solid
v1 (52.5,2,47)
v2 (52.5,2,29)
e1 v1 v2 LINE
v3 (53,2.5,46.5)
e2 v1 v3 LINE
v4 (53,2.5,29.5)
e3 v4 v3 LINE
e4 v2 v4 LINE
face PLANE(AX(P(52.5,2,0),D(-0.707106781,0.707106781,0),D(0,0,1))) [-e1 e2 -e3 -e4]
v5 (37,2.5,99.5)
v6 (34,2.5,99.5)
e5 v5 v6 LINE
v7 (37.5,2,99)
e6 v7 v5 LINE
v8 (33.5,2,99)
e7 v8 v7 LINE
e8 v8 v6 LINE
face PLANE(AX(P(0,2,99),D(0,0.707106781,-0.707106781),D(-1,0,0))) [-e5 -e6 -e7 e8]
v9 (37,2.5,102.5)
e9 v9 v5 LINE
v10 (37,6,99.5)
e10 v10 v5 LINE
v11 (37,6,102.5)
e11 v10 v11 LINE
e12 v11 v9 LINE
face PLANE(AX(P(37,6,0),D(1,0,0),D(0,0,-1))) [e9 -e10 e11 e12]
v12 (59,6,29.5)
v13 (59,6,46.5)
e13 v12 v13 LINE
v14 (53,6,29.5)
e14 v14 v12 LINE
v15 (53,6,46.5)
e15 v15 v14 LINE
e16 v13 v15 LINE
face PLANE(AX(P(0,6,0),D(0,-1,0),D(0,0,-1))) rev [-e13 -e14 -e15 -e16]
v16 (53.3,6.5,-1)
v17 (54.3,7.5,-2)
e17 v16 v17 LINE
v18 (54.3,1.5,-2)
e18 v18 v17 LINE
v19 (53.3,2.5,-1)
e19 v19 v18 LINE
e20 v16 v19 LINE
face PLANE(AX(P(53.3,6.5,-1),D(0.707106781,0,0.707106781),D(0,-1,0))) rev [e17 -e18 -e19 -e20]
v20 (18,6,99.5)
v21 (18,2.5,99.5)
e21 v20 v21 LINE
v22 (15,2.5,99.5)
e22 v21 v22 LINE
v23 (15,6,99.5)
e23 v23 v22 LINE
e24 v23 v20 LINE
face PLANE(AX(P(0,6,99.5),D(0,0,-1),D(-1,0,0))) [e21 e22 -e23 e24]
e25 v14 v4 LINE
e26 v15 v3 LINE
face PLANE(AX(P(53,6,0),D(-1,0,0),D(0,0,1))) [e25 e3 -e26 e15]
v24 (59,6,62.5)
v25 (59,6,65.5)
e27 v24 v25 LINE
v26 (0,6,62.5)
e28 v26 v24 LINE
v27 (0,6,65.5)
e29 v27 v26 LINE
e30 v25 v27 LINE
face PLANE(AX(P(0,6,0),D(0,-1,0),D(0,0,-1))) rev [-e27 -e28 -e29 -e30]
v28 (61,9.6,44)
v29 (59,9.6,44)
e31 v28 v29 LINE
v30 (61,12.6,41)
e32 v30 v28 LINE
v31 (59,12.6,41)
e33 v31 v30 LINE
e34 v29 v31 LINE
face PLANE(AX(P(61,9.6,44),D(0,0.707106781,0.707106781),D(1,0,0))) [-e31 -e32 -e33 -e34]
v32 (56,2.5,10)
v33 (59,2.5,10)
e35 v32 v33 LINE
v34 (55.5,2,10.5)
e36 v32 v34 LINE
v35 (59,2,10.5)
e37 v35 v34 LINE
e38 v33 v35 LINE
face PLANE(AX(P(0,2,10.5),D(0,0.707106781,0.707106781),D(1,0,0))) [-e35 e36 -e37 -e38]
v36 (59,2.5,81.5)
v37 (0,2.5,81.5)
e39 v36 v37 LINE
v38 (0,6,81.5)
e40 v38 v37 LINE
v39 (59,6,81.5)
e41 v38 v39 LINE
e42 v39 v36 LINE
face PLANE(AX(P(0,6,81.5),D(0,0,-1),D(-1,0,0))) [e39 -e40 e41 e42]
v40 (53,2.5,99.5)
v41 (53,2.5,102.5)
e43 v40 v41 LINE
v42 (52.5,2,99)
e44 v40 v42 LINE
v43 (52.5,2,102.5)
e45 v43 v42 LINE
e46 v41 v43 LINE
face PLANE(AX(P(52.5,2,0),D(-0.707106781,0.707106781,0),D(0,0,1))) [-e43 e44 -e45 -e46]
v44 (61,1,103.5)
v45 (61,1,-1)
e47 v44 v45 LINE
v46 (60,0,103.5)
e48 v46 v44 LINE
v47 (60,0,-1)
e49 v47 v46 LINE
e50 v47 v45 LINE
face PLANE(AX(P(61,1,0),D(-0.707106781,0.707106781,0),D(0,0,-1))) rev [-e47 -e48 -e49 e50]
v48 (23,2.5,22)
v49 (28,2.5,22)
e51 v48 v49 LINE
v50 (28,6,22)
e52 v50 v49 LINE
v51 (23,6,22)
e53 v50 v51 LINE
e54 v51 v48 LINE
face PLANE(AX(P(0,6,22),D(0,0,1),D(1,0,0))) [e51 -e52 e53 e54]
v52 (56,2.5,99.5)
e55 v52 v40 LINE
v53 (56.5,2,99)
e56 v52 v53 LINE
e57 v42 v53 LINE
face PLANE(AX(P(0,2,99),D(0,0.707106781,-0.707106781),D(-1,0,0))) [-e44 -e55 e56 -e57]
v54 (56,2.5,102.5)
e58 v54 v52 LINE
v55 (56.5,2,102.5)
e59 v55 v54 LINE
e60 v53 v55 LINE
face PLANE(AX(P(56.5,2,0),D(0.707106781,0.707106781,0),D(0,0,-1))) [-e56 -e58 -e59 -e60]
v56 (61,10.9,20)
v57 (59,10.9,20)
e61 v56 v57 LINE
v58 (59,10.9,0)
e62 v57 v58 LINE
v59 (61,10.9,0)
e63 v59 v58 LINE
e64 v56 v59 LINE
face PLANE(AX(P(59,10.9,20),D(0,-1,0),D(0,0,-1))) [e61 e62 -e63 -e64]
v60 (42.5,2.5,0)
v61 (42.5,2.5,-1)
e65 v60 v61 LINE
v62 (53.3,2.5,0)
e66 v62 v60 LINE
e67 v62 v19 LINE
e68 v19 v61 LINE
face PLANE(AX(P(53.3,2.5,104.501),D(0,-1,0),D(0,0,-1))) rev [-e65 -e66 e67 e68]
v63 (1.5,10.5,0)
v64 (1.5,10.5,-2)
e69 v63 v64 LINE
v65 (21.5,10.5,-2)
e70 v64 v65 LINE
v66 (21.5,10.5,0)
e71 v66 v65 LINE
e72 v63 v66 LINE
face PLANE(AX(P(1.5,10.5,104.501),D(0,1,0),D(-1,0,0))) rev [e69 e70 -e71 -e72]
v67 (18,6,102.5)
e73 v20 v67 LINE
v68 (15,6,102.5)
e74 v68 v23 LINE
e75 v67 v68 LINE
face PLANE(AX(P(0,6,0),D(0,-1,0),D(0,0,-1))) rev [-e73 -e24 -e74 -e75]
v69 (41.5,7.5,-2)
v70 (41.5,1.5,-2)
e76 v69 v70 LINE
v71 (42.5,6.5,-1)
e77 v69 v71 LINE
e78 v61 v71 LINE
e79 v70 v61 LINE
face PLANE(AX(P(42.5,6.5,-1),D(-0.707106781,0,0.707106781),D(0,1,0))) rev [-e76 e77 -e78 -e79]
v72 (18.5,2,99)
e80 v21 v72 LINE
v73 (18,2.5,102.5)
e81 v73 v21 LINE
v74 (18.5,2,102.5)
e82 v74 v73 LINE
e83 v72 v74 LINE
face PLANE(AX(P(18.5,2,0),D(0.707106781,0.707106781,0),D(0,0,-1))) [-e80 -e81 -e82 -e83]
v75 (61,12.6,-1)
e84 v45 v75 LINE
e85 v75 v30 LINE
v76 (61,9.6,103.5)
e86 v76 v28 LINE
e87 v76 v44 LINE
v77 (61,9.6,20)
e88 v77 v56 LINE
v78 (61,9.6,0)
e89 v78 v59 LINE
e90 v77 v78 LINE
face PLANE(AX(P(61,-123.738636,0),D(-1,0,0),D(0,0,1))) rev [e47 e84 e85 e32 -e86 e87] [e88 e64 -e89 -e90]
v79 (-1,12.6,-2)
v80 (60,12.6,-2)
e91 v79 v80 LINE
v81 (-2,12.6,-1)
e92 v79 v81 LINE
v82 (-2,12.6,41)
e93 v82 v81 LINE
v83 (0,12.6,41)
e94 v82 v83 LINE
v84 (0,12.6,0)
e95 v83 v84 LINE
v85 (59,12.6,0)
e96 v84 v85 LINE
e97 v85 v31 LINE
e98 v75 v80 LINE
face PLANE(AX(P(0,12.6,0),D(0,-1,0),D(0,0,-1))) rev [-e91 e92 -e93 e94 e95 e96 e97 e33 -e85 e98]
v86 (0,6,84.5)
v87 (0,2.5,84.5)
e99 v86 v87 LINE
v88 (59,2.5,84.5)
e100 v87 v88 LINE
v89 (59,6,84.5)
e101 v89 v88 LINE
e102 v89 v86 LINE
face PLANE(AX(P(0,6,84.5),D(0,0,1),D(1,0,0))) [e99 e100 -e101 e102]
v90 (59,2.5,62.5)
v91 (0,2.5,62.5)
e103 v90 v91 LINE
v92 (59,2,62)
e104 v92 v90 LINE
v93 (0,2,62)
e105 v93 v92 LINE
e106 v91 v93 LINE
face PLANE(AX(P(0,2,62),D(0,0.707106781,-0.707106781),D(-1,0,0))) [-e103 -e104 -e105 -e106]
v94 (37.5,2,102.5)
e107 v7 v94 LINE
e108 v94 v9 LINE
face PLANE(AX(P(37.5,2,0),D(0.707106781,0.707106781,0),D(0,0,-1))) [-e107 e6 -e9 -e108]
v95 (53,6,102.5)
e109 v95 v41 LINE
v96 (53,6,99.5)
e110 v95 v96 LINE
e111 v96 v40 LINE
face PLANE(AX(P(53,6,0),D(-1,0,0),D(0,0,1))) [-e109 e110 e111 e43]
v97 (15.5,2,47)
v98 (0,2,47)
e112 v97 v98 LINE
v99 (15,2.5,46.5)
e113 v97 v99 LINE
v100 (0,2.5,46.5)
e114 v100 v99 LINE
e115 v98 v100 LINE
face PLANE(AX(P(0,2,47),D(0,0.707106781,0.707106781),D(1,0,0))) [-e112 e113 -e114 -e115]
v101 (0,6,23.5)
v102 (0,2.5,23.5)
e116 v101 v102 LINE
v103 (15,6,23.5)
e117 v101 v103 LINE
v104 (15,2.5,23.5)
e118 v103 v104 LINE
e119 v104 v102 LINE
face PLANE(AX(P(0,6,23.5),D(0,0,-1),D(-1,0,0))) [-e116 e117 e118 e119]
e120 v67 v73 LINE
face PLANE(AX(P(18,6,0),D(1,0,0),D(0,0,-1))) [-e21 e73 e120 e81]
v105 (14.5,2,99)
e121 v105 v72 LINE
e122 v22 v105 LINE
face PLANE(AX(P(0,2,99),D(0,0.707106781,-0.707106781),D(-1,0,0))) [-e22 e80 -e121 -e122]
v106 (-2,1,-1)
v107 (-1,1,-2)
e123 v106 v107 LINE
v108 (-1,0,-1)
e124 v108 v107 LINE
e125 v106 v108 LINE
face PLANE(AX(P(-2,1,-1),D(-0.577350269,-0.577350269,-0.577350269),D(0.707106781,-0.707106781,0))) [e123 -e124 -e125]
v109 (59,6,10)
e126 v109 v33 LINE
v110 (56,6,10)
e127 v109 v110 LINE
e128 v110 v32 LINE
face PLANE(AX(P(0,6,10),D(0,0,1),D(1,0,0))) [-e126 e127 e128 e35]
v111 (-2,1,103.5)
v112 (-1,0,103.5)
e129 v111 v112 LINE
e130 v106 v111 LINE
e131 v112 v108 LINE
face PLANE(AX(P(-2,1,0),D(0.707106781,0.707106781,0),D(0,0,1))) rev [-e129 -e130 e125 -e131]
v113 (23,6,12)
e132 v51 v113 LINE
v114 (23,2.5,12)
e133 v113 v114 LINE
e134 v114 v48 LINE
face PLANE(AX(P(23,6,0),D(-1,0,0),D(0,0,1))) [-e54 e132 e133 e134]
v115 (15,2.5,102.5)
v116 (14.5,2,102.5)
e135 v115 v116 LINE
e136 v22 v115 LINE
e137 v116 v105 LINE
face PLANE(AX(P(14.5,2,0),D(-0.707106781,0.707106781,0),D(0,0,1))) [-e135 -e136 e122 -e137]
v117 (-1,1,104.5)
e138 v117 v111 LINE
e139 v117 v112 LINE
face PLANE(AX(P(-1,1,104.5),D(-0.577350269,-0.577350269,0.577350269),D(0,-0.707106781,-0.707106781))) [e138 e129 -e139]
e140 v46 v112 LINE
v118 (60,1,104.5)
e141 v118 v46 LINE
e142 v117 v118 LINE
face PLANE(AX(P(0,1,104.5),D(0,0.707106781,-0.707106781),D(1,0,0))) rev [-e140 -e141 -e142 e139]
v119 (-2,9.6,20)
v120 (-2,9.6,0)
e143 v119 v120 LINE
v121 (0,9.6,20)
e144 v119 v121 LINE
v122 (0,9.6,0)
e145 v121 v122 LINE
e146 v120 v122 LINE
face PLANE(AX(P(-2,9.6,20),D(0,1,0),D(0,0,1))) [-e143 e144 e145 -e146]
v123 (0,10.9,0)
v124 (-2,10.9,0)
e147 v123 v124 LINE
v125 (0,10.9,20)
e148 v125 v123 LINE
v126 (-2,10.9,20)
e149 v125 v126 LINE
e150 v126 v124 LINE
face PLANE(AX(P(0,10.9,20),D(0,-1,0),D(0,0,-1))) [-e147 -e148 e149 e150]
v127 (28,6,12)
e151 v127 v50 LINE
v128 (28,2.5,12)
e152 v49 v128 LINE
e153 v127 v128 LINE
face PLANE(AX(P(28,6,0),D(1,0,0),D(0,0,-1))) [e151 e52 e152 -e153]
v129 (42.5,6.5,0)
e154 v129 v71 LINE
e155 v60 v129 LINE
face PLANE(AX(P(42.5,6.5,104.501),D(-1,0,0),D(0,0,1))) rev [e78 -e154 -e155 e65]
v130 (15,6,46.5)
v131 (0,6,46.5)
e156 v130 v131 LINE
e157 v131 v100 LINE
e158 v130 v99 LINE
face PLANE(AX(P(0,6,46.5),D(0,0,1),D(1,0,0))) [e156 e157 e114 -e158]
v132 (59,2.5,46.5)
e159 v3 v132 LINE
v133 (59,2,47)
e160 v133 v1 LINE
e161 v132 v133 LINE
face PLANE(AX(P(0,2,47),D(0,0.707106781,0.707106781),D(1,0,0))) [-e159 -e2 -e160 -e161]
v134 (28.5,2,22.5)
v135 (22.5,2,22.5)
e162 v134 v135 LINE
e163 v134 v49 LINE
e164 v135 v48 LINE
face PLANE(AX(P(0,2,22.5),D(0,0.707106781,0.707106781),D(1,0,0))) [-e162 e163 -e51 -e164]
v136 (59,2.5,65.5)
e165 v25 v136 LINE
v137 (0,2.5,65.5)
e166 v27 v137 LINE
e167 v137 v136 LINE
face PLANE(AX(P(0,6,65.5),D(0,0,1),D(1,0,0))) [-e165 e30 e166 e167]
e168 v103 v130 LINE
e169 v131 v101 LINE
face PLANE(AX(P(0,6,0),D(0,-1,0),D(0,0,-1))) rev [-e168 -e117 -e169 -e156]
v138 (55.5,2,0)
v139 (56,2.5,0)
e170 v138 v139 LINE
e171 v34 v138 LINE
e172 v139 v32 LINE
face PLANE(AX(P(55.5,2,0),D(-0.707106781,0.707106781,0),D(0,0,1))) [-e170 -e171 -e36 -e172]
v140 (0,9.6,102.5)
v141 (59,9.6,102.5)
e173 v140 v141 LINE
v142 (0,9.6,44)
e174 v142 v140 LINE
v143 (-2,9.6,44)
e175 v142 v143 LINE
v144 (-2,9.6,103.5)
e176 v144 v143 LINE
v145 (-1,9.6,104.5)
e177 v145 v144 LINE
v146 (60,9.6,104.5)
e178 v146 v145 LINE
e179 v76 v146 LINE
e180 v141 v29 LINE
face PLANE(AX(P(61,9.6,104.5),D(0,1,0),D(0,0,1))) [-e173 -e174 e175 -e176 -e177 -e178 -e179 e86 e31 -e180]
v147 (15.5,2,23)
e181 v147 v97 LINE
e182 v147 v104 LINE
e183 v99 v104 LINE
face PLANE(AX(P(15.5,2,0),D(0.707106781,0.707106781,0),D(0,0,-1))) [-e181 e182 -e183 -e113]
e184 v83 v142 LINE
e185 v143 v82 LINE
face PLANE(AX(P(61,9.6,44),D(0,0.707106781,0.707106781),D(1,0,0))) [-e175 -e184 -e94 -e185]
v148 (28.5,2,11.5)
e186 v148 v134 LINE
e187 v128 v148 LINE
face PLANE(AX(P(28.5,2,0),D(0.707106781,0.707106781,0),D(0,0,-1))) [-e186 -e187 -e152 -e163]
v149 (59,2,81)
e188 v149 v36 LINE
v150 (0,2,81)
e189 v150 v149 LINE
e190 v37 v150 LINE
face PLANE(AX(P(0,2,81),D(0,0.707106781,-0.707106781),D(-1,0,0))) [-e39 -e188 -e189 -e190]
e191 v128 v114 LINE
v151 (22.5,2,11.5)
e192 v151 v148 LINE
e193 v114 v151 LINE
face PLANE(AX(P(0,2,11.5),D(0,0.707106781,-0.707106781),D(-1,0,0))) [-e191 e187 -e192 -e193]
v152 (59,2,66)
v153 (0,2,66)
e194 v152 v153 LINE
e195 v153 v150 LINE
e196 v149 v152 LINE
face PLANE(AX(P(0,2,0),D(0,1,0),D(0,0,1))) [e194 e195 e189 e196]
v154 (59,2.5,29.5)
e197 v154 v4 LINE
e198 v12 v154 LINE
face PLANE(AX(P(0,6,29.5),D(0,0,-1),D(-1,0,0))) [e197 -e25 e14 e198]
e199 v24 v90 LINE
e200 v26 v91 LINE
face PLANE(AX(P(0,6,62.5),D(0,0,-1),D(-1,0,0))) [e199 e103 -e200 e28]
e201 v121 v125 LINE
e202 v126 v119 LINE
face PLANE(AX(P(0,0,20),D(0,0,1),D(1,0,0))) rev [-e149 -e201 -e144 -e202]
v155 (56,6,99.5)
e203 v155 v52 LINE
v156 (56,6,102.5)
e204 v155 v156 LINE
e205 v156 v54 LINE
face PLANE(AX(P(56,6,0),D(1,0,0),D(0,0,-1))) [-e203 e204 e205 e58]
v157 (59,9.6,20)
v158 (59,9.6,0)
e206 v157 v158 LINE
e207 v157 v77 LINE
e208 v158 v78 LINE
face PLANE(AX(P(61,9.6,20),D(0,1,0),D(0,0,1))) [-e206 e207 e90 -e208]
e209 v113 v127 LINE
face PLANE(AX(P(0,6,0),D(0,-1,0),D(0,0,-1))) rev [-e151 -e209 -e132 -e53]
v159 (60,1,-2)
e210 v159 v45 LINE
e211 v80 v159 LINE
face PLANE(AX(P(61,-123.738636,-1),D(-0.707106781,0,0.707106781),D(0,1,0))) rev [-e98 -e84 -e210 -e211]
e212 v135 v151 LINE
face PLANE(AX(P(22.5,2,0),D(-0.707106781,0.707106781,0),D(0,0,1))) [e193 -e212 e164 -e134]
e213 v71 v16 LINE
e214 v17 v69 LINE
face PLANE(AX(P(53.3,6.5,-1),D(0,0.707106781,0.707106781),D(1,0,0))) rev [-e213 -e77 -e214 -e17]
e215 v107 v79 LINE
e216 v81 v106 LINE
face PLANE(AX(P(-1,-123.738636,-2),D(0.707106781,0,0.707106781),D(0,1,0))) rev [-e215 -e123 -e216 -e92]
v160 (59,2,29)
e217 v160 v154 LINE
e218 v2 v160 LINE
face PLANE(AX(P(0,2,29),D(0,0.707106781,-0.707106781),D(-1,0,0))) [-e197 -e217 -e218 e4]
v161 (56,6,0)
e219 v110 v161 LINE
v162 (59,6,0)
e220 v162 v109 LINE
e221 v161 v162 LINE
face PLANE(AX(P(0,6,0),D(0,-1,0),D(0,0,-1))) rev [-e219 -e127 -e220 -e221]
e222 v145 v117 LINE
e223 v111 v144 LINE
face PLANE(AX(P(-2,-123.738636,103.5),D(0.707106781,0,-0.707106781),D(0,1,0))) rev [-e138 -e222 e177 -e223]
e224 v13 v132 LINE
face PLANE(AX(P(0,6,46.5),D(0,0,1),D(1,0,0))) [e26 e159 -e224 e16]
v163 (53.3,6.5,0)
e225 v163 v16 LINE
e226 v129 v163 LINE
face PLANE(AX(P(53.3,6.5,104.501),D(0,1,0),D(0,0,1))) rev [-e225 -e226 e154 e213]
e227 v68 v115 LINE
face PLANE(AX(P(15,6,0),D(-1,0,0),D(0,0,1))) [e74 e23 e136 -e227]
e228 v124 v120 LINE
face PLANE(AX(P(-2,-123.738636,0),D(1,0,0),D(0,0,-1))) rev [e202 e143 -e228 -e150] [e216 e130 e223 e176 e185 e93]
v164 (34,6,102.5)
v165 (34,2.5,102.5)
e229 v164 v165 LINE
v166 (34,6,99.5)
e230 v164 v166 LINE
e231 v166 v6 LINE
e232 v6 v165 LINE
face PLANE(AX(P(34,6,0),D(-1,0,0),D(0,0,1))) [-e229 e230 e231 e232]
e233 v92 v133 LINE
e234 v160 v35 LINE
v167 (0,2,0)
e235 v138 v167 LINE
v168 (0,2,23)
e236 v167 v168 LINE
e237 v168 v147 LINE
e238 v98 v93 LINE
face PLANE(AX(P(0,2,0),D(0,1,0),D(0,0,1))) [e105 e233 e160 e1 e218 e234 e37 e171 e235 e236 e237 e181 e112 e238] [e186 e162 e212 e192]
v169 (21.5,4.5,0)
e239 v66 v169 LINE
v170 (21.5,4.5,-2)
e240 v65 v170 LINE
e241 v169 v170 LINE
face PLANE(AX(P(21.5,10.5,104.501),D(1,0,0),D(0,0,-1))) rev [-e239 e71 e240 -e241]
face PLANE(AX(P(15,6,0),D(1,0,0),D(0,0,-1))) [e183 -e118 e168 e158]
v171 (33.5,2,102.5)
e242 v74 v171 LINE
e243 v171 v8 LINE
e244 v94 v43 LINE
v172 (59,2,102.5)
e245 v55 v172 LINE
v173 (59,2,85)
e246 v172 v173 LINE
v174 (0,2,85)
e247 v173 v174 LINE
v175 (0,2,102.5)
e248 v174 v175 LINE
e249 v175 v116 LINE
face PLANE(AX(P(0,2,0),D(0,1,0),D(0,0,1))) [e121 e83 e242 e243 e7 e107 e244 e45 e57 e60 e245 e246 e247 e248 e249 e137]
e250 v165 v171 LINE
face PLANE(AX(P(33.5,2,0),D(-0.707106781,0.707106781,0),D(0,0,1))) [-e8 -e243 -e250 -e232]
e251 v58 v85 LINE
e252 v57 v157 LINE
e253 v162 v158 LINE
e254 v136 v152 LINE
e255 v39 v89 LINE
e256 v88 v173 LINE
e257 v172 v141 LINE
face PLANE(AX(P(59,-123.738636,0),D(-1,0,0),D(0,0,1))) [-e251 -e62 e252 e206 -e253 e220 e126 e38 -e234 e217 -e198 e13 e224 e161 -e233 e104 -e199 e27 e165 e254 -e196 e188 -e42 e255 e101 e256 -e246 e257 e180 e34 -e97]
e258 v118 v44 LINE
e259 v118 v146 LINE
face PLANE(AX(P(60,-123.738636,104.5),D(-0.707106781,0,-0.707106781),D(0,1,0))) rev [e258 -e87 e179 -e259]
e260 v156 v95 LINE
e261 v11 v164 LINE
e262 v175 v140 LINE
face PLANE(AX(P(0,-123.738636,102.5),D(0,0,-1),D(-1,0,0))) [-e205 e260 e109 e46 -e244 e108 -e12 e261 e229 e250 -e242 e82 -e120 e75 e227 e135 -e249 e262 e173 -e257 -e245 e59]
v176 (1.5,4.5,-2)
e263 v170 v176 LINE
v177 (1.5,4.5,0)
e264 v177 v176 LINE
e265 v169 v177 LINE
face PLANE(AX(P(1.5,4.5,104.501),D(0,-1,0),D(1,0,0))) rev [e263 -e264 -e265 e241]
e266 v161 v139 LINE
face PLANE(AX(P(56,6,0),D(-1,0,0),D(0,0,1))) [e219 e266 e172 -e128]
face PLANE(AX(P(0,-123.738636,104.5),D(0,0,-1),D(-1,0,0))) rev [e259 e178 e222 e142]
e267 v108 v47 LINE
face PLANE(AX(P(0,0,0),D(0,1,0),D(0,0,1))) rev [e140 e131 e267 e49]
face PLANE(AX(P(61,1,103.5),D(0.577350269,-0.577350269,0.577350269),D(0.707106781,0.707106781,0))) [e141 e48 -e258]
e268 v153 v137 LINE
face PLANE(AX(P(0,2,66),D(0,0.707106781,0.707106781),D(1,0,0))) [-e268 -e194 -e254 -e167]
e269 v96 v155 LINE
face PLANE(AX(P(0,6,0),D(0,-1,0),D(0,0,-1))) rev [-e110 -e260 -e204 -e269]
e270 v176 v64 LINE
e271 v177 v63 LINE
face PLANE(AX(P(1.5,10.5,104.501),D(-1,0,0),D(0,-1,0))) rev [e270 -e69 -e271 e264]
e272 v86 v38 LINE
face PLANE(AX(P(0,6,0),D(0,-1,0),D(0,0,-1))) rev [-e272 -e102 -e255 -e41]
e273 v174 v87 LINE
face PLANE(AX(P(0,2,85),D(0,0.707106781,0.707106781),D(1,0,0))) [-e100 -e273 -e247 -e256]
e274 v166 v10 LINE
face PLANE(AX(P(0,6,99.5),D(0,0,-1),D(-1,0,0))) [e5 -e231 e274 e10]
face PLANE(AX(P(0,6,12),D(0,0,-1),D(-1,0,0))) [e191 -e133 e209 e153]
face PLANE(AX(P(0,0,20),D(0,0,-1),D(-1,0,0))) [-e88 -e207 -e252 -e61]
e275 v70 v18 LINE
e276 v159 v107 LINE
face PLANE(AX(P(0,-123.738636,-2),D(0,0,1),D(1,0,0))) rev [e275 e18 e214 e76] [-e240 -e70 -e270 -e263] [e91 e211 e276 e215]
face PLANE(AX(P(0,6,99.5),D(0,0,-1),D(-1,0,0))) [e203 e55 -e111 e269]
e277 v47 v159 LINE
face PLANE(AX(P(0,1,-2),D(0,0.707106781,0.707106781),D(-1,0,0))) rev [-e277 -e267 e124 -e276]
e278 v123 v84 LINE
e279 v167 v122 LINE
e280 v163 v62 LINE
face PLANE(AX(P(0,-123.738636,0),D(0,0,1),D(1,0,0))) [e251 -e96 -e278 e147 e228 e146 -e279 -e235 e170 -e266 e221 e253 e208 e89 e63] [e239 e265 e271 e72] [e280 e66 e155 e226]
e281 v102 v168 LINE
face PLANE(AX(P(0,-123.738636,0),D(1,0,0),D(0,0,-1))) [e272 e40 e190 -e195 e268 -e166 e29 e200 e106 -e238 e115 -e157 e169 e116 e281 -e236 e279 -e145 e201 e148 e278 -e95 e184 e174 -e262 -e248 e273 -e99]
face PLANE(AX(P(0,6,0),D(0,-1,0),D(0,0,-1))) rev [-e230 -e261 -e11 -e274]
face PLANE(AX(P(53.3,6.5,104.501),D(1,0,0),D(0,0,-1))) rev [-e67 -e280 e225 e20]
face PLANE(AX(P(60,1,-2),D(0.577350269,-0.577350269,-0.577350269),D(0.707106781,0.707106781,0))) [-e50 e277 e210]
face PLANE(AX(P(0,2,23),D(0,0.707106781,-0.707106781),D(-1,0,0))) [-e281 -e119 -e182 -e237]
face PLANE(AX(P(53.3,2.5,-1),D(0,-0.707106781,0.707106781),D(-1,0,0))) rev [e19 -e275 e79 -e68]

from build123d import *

# Parameters (mm, degrees)
SKETCH1_W               = 59
SKETCH1_H               = 102.5
BOSS_EXTRUDE1_DEPTH     = 2
SKETCH2_W               = 63
SKETCH2_H               = 106.5
SKETCH2_W_2             = 59
SKETCH2_H_2             = 102.5
BOSS_EXTRUDE2_DEPTH     = 12.6
SKETCH4_W               = 59
SKETCH4_H               = 3
SKETCH4_W_2             = 3
SKETCH4_W_3             = 15
SKETCH4_H_2             = 23
SKETCH4_W_4             = 6
SKETCH4_H_3             = 17
SKETCH4_H_4             = 10
SKETCH4_W_5             = 5
BOSS_EXTRUDE3_DEPTH     = 4
CUT_EXTRUDE1_REACH      = 125.378
SKETCH5_W               = 20
SKETCH5_H               = 6
SKETCH5_W_2             = 10.8
SKETCH5_H_2             = 4
CHAMFER1_SIZE           = 0.5
CHAMFER2_SIZE           = 1
SKETCH6_W               = 2
SKETCH6_H               = 1.3
CUT_EXTRUDE2_DEPTH      = 20
CUT_EXTRUDE3_DEPTH      = 122.655291706
CUT_EXTRUDE3_DEPTH_BACK = 122.655291706
SKETCH7_W               = 60.5
SKETCH7_H               = 3
CHAMFER3_SIZE           = 3


with BuildPart() as part:
    # Sketch1 → Boss-Extrude1 (new body)
    with BuildSketch(Plane(origin=(0, 0, 0), x_dir=(1, 0, 0), z_dir=(0, 1, 0))):
        with Locations((29.5, -51.25)):
            Rectangle(SKETCH1_W, SKETCH1_H)
    extrude(amount=BOSS_EXTRUDE1_DEPTH)

    # Sketch2 → Boss-Extrude2 (add)
    with BuildSketch(Plane(origin=(0, 0, 0), x_dir=(1, 0, 0), z_dir=(0, 1, 0))):
        with Locations((29.5, -51.25)):
            Rectangle(SKETCH2_W, SKETCH2_H)
        with Locations((29.5, -51.25)):
            Rectangle(SKETCH2_W_2, SKETCH2_H_2, mode=Mode.SUBTRACT)
    extrude(amount=BOSS_EXTRUDE2_DEPTH)

    # Sketch4 → Boss-Extrude3 (add)
    with BuildSketch(Plane(origin=(0, 2, 0), x_dir=(1, 0, 0), z_dir=(0, 1, 0))):
        with Locations((29.5, -83)):
            Rectangle(SKETCH4_W, SKETCH4_H)
        with Locations((29.5, -64)):
            Rectangle(SKETCH4_W, SKETCH4_H)
        with Locations((16.5, -101)):
            Rectangle(SKETCH4_W_2, SKETCH4_H)
        with Locations((35.5, -101)):
            Rectangle(SKETCH4_W_2, SKETCH4_H)
        with Locations((54.5, -101)):
            Rectangle(SKETCH4_W_2, SKETCH4_H)
        with Locations((7.5, -35)):
            Rectangle(SKETCH4_W_3, SKETCH4_H_2)
        with Locations((56, -38)):
            Rectangle(SKETCH4_W_4, SKETCH4_H_3)
        with Locations((57.5, -5)):
            Rectangle(SKETCH4_W_2, SKETCH4_H_4)
        with Locations((25.5, -17)):
            Rectangle(SKETCH4_W_5, SKETCH4_H_4)
    extrude(amount=BOSS_EXTRUDE3_DEPTH)

    # Sketch5 → Cut-Extrude1 (cut, up to next)
    with BuildSketch(Plane(origin=(0, 0, -2), x_dir=(-1, 0, 0), z_dir=(0, 0, -1)), mode=Mode.PRIVATE) as cut_extrude1_sk1:
        with Locations((-11.5, 7.5)):
            Rectangle(SKETCH5_W, SKETCH5_H)
    cut_extrude1_tool1 = extrude(cut_extrude1_sk1.sketch, amount=-CUT_EXTRUDE1_REACH, mode=Mode.PRIVATE) & part.part
    # Sketch5 → Cut-Extrude1 (cut, up to next)
    with BuildSketch(Plane(origin=(0, 0, -2), x_dir=(-1, 0, 0), z_dir=(0, 0, -1)), mode=Mode.PRIVATE) as cut_extrude1_sk2:
        with Locations((-47.9, 4.5)):
            Rectangle(SKETCH5_W_2, SKETCH5_H_2)
    cut_extrude1_tool2 = extrude(cut_extrude1_sk2.sketch, amount=-CUT_EXTRUDE1_REACH, mode=Mode.PRIVATE) & part.part
    add(cut_extrude1_tool1.solids().sort_by_distance((11.5, 7.5, -2))[0], mode=Mode.SUBTRACT)
    add(cut_extrude1_tool2.solids().sort_by_distance((47.9, 4.5, -2))[0], mode=Mode.SUBTRACT)

    # Chamfer1
    chamfer1_edges = [part.edges().sort_by_distance(p)[0] for p in [
        (18, 2, 101),
        (15, 2, 101),
        (16.5, 2, 99.5),
        (37, 2, 101),
        (34, 2, 101),
        (35.5, 2, 99.5),
        (56, 2, 101),
        (53, 2, 101),
        (54.5, 2, 99.5),
        (29.5, 2, 84.5),
        (29.5, 2, 81.5),
        (28, 2, 17),
        (25.5, 2, 22),
        (23, 2, 17),
        (25.5, 2, 12),
        (56, 2, 5),
        (57.5, 2, 10),
        (56, 2, 46.5),
        (53, 2, 38),
        (56, 2, 29.5),
        (7.5, 2, 23.5),
        (15, 2, 35),
        (7.5, 2, 46.5),
        (29.5, 2, 65.5),
        (29.5, 2, 62.5),
    ]]
    chamfer(chamfer1_edges, length=CHAMFER1_SIZE)

    # Chamfer2
    chamfer2_edges = [part.edges().sort_by_distance(p)[0] for p in [
        (-2, 0, 51.25),
        (-2, 6.3, 104.5),
        (29.5, 0, -2),
        (-2, 6.3, -2),
        (61, 0, 51.25),
        (61, 6.3, -2),
        (29.5, 0, 104.5),
        (61, 6.3, 104.5),
        (53.3, 4.5, -2),
        (47.9, 2.5, -2),
        (42.5, 4.5, -2),
        (47.9, 6.5, -2),
    ]]
    chamfer(chamfer2_edges, length=CHAMFER2_SIZE)

    # Sketch6 → Cut-Extrude2 (cut)
    with BuildSketch(Plane.XY):
        with Locations((-1, 10.25)):
            Rectangle(SKETCH6_W, SKETCH6_H)
        with Locations((60, 10.25)):
            Rectangle(SKETCH6_W, SKETCH6_H)
    extrude(amount=CUT_EXTRUDE2_DEPTH, mode=Mode.SUBTRACT)

    # Sketch7 → Cut-Extrude3 (cut, two sides: drawn at the far end of the back side and taken through both)
    with BuildSketch(Plane(origin=(0, 0, 0), x_dir=(0, 0, -1), z_dir=(1, 0, 0)).offset(-CUT_EXTRUDE3_DEPTH_BACK)):
        with Locations((-74.25, 11.1)):
            Rectangle(SKETCH7_W, SKETCH7_H)
    extrude(amount=CUT_EXTRUDE3_DEPTH + CUT_EXTRUDE3_DEPTH_BACK, mode=Mode.SUBTRACT)

    # Chamfer3
    chamfer3_edges = [part.edges().sort_by_distance(p)[0] for p in [
        (-1, 12.6, 44),
        (60, 12.6, 44),
    ]]
    chamfer(chamfer3_edges, length=CHAMFER3_SIZE - 0.0001)  # a hair under: the kernel refuses the full size


solid = part.part
